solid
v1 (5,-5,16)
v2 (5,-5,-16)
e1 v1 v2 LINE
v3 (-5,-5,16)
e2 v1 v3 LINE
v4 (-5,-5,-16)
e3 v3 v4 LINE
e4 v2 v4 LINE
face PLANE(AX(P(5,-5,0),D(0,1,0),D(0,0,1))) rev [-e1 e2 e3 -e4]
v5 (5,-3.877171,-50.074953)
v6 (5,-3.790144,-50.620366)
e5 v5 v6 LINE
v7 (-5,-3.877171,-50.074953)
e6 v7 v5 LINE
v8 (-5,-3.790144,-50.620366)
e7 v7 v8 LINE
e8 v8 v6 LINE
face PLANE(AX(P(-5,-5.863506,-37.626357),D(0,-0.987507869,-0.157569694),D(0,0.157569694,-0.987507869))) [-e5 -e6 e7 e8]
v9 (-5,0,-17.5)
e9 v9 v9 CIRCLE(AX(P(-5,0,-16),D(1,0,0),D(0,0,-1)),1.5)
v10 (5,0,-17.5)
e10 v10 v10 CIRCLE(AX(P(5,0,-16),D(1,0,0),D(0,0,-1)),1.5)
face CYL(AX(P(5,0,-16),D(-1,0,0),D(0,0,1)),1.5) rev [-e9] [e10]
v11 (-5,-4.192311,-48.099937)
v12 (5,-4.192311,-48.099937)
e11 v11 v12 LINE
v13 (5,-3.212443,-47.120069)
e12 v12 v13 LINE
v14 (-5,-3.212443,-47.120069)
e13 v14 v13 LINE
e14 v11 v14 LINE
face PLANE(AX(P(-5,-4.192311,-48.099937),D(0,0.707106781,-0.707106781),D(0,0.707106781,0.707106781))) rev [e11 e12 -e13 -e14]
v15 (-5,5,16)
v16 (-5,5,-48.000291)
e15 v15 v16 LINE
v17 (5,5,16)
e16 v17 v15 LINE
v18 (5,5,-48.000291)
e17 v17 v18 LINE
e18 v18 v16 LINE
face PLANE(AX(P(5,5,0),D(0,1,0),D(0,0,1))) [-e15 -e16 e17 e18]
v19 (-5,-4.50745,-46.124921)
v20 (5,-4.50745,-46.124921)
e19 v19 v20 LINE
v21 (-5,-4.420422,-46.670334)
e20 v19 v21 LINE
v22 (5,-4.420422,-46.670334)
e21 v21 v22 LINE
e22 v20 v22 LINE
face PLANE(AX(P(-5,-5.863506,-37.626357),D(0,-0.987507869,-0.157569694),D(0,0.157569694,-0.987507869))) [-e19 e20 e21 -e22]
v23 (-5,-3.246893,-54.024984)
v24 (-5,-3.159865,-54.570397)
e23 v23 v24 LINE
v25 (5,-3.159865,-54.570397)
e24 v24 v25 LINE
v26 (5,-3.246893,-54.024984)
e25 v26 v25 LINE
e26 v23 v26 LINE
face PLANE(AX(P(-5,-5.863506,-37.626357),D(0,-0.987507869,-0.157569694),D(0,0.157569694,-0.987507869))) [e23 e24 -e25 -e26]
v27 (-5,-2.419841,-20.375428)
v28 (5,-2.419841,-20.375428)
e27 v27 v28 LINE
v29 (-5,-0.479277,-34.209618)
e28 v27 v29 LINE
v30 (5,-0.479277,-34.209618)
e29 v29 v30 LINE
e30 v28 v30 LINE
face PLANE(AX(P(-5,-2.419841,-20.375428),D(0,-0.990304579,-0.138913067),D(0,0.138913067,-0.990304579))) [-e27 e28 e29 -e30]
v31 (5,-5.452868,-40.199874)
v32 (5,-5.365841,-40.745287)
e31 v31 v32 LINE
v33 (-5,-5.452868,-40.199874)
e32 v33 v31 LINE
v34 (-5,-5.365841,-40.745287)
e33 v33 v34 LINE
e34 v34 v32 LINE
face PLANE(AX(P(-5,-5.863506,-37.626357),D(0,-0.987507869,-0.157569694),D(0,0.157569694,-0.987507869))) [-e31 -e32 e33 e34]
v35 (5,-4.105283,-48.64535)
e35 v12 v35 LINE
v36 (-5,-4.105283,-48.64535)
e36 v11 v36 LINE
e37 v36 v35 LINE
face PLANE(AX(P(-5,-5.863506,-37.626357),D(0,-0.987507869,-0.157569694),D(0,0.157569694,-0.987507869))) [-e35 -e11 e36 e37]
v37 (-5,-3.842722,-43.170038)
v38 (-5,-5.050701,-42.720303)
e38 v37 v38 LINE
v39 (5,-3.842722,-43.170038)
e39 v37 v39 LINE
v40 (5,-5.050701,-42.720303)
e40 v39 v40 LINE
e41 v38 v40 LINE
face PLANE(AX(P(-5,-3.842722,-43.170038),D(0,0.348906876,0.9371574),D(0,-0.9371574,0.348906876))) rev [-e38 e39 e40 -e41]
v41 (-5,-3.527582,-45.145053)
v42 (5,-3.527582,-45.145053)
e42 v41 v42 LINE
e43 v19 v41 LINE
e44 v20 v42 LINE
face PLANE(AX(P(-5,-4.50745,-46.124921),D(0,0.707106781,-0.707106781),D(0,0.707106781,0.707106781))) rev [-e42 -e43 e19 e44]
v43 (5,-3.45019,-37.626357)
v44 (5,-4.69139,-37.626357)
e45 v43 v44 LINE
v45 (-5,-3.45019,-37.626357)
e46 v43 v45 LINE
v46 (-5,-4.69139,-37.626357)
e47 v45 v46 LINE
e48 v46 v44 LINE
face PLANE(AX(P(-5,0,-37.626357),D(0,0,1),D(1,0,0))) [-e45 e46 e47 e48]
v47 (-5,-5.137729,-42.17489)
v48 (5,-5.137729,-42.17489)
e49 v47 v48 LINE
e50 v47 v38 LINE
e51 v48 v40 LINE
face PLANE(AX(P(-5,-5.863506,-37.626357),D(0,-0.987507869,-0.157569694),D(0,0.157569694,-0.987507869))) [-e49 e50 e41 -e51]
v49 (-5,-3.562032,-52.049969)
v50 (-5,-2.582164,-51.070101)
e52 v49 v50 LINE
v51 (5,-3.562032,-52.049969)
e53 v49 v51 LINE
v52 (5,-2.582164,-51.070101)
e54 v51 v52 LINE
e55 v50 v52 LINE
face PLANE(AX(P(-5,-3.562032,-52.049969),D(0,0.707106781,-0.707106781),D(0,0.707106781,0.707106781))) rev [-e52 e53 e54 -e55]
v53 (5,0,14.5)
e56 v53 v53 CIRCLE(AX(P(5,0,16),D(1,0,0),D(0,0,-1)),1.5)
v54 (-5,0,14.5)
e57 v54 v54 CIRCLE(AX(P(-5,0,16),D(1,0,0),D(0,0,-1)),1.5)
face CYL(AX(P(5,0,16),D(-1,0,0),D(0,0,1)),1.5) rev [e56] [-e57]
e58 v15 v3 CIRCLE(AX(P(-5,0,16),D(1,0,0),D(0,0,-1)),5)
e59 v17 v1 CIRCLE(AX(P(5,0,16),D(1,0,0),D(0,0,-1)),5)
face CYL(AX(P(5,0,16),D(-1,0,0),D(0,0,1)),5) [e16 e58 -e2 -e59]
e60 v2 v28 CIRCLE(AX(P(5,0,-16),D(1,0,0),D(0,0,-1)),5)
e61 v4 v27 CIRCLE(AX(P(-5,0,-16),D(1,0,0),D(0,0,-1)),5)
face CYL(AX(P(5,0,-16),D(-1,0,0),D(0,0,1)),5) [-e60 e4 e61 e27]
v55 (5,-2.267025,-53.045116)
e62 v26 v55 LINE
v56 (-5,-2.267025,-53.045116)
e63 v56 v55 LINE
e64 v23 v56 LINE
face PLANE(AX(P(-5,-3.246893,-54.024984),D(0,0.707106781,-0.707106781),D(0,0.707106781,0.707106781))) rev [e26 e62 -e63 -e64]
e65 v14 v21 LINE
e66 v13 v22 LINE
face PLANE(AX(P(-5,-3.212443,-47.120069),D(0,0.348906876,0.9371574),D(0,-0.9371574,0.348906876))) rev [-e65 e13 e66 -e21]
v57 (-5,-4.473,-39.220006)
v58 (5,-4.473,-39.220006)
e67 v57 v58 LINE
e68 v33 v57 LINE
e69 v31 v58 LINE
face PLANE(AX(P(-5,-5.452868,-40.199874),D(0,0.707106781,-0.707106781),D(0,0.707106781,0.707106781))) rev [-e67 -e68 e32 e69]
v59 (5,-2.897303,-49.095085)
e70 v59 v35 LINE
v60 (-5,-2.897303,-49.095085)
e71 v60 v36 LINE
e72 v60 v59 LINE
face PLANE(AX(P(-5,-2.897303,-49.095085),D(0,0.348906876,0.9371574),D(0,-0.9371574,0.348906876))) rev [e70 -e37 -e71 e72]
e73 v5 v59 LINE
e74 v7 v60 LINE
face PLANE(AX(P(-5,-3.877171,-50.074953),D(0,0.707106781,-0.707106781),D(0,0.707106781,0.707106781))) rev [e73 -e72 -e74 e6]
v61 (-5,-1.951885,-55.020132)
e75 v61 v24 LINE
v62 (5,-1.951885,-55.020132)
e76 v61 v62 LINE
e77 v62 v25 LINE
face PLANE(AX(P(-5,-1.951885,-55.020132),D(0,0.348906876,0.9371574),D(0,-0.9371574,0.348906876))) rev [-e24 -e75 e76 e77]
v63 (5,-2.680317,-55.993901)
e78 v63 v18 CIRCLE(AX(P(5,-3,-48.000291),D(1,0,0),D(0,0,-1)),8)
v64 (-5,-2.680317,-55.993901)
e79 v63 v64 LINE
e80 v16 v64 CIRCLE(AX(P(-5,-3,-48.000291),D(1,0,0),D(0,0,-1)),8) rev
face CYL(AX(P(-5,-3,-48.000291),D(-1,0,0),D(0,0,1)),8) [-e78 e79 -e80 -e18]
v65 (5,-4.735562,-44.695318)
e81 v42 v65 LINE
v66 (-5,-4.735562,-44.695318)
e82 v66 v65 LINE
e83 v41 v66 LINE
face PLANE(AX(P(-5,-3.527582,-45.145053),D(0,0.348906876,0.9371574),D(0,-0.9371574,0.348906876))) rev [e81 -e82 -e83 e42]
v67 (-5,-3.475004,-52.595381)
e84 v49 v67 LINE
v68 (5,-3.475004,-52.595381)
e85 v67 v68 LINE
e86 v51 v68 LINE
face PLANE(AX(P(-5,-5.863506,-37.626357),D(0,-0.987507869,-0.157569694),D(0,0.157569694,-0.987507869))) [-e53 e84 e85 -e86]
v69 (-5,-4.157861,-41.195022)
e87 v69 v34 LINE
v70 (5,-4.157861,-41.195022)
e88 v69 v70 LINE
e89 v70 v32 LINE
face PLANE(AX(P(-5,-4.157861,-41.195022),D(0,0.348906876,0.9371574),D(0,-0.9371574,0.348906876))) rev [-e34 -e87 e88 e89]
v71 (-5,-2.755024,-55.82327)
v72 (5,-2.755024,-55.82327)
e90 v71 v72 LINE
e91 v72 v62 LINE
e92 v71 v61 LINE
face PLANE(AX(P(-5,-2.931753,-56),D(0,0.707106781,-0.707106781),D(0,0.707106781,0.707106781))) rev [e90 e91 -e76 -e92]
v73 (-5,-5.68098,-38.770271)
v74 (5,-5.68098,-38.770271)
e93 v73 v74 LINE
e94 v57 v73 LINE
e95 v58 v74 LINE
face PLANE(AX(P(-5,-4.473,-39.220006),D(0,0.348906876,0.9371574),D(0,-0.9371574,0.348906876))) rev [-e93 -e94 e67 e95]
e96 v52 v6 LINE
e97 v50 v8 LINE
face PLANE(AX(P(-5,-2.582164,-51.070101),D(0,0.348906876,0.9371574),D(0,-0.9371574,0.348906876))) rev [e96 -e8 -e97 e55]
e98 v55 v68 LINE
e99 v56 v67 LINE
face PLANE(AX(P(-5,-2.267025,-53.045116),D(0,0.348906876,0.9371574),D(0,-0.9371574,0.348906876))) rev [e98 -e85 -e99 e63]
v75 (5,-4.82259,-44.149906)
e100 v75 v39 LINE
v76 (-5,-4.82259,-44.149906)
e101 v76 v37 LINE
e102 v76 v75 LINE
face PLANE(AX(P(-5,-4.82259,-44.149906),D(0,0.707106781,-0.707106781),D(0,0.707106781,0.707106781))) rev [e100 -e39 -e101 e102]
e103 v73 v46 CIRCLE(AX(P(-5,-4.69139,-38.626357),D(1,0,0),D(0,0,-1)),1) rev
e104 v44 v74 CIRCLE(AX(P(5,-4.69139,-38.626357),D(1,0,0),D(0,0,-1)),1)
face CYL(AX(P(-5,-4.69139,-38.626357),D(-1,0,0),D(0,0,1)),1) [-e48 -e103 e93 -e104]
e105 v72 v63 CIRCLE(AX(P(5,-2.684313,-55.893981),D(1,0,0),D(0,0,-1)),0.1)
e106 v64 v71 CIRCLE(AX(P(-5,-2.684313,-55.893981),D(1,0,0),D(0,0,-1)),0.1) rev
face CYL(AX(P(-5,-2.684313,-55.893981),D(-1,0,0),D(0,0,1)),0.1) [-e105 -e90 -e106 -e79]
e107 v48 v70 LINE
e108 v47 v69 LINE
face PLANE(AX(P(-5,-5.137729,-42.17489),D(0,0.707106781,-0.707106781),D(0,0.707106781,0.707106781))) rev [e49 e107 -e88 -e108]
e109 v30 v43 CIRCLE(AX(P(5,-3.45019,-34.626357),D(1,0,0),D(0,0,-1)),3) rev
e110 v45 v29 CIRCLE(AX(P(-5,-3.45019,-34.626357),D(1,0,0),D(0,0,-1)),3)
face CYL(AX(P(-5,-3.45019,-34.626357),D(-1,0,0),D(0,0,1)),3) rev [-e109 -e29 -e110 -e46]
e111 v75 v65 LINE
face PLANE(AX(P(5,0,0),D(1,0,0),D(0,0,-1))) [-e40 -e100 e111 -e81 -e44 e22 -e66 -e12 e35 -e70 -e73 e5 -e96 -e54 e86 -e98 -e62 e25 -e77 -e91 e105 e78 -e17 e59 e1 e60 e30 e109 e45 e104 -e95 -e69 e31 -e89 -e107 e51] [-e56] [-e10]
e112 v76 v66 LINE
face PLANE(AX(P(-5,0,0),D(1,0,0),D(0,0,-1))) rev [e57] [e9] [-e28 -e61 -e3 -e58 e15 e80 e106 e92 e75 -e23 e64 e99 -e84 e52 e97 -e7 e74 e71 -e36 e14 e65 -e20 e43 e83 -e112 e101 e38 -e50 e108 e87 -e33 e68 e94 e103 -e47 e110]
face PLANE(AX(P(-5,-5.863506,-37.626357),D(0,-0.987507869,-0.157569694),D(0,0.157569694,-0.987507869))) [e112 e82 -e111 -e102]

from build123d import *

# Parameters (mm, degrees)
SKETCH1_R           = 5
SKETCH1_R_2         = 1.5
BOSS_EXTRUDE1_DEPTH = 5
BOSS_EXTRUDE4_DEPTH = 10
FILLET5_R           = 3
FILLET7_R           = 8
CUT_EXTRUDE6_DEPTH  = 10
FILLET9_R           = 1
FILLET11_R          = 0.1


with BuildPart() as part:
    # Sketch1 → Boss-Extrude1 (new, symmetric)
    # profile 1 of 3: a face of its own
    with BuildSketch(Plane(origin=(0, 0, 0), x_dir=(0, 0, -1), z_dir=(1, 0, 0))):
        with BuildLine():
            ThreePointArc((-11, 0), (-12.464466094, -3.535533906), (-16, -5))
            Line((-16, -5), (16, -5))
            ThreePointArc((16, -5), (11, 0), (16, 5))
            Line((16, 5), (-16, 5))
            ThreePointArc((-16, 5), (-12.464466094, 3.535533906), (-11, 0))
        make_face()
    # profile 2 of 3: a face of its own
    with BuildSketch(Plane(origin=(0, 0, 0), x_dir=(0, 0, -1), z_dir=(1, 0, 0))):
        with Locations((-16, 0)):
            Circle(SKETCH1_R)
        with Locations((-16, 0)):
            Circle(SKETCH1_R_2, mode=Mode.SUBTRACT)
    # profile 3 of 3: a face of its own
    with BuildSketch(Plane(origin=(0, 0, 0), x_dir=(0, 0, -1), z_dir=(1, 0, 0))):
        with Locations((16, 0)):
            Circle(SKETCH1_R)
        with Locations((16, 0)):
            Circle(SKETCH1_R_2, mode=Mode.SUBTRACT)
    extrude(amount=BOSS_EXTRUDE1_DEPTH, both=True)

    # Sketch6 → Boss-Extrude4 (add)
    with BuildSketch(Plane(origin=(5, 0, 0), x_dir=(0, 0, -1), z_dir=(1, 0, 0))):
        with BuildLine():
            Line((20.375428035, -2.419840804), (37.626356882, 0))
            Line((37.626356882, 0), (37.626356882, -5.863506349))
            Line((37.626356882, -5.863506349), (56, -2.931753174))
            Line((56, -2.931753174), (56, -0.788607304))
            Line((56, -0.788607304), (56, 5))
            Line((56, 5), (16, 5))
            ThreePointArc((16, 5), (20.30692489, 2.539763373), (20.375428035, -2.419840804))
        make_face()
    extrude(amount=-BOSS_EXTRUDE4_DEPTH)

    # Fillet5
    fillet5_edges = [part.edges().sort_by_distance(p)[0] for p in [
        (0, 0, -37.626356882),
    ]]
    fillet(fillet5_edges, radius=FILLET5_R)

    # Fillet7
    # the kernel refuses this fillet: 8 mm, written as the material it takes off along each edge
    with BuildSketch(Plane(origin=(25, 5, -56), x_dir=(0, -1, 0), z_dir=(-1, 0, 0))) as fillet7_piece_1:
        with BuildLine():
            CenterArc((FILLET7_R, FILLET7_R), FILLET7_R, 180, 90)
            Line((0, FILLET7_R), (0, 0))
            Line((0, 0), (FILLET7_R, 0))
        make_face()
    extrude(amount=50, mode=Mode.SUBTRACT)

    # Sketch8 → Cut-Extrude6 (cut)
    with BuildSketch(Plane(origin=(5, 0, 0), x_dir=(0, 0, -1), z_dir=(1, 0, 0))):
        Polygon((56, -2.931753174), (55.020132037, -1.951885211), (54.570397118, -3.159864865), (54.024984262, -3.246892563), (53.045116299, -2.2670246), (52.59538138, -3.475004253), (52.049968524, -3.562031952), (51.070100561, -2.582163988), (50.620365642, -3.790143642), (50.074952786, -3.87717134), (49.095084823, -2.897303377), (48.645349904, -4.10528303), (48.099937048, -4.192310729), (47.120069084, -3.212442766), (46.670334166, -4.420422419), (46.12492131, -4.507450118), (45.145053346, -3.527582154), (44.695318427, -4.735561808), (44.149905571, -4.822589506), (43.170037608, -3.842721543), (42.720302689, -5.050701196), (42.174889833, -5.137728895), (41.19502187, -4.157860932), (40.745286951, -5.365840585), (40.199874095, -5.452868283), (39.220006132, -4.47300032), (38.770271213, -5.680979974), (37.626356882, -5.863506349), (46.12492131, -12.960580579), align=None)
    extrude(amount=-CUT_EXTRUDE6_DEPTH, mode=Mode.SUBTRACT)

    # Fillet9
    # the kernel refuses this fillet: 1 mm, written as the material it takes off along each edge
    with BuildSketch(Plane(origin=(7.930532836, -5.863506349, -37.626356882), x_dir=(0, 0.15756969432487367, -0.9875078690473135), z_dir=(-1, 0, 0))) as fillet9_piece_1:
        with BuildLine():
            CenterArc((FILLET9_R * 1.1722131343, -FILLET9_R), FILLET9_R, 90, 99.065860636)
            Line((FILLET9_R * 0.184705265256, -FILLET9_R * 1.15756969432), (0, 0))
            Line((0, 0), (FILLET9_R * 1.1722131343, 0))
        make_face()
    extrude(amount=15.861065672, mode=Mode.SUBTRACT)

    # Fillet11
    fillet11_edges = [part.edges().sort_by_distance(p)[0] for p in [
        (0, -2.931459557, -55.999706383),
    ]]
    fillet(fillet11_edges, radius=FILLET11_R)


solid = part.part
